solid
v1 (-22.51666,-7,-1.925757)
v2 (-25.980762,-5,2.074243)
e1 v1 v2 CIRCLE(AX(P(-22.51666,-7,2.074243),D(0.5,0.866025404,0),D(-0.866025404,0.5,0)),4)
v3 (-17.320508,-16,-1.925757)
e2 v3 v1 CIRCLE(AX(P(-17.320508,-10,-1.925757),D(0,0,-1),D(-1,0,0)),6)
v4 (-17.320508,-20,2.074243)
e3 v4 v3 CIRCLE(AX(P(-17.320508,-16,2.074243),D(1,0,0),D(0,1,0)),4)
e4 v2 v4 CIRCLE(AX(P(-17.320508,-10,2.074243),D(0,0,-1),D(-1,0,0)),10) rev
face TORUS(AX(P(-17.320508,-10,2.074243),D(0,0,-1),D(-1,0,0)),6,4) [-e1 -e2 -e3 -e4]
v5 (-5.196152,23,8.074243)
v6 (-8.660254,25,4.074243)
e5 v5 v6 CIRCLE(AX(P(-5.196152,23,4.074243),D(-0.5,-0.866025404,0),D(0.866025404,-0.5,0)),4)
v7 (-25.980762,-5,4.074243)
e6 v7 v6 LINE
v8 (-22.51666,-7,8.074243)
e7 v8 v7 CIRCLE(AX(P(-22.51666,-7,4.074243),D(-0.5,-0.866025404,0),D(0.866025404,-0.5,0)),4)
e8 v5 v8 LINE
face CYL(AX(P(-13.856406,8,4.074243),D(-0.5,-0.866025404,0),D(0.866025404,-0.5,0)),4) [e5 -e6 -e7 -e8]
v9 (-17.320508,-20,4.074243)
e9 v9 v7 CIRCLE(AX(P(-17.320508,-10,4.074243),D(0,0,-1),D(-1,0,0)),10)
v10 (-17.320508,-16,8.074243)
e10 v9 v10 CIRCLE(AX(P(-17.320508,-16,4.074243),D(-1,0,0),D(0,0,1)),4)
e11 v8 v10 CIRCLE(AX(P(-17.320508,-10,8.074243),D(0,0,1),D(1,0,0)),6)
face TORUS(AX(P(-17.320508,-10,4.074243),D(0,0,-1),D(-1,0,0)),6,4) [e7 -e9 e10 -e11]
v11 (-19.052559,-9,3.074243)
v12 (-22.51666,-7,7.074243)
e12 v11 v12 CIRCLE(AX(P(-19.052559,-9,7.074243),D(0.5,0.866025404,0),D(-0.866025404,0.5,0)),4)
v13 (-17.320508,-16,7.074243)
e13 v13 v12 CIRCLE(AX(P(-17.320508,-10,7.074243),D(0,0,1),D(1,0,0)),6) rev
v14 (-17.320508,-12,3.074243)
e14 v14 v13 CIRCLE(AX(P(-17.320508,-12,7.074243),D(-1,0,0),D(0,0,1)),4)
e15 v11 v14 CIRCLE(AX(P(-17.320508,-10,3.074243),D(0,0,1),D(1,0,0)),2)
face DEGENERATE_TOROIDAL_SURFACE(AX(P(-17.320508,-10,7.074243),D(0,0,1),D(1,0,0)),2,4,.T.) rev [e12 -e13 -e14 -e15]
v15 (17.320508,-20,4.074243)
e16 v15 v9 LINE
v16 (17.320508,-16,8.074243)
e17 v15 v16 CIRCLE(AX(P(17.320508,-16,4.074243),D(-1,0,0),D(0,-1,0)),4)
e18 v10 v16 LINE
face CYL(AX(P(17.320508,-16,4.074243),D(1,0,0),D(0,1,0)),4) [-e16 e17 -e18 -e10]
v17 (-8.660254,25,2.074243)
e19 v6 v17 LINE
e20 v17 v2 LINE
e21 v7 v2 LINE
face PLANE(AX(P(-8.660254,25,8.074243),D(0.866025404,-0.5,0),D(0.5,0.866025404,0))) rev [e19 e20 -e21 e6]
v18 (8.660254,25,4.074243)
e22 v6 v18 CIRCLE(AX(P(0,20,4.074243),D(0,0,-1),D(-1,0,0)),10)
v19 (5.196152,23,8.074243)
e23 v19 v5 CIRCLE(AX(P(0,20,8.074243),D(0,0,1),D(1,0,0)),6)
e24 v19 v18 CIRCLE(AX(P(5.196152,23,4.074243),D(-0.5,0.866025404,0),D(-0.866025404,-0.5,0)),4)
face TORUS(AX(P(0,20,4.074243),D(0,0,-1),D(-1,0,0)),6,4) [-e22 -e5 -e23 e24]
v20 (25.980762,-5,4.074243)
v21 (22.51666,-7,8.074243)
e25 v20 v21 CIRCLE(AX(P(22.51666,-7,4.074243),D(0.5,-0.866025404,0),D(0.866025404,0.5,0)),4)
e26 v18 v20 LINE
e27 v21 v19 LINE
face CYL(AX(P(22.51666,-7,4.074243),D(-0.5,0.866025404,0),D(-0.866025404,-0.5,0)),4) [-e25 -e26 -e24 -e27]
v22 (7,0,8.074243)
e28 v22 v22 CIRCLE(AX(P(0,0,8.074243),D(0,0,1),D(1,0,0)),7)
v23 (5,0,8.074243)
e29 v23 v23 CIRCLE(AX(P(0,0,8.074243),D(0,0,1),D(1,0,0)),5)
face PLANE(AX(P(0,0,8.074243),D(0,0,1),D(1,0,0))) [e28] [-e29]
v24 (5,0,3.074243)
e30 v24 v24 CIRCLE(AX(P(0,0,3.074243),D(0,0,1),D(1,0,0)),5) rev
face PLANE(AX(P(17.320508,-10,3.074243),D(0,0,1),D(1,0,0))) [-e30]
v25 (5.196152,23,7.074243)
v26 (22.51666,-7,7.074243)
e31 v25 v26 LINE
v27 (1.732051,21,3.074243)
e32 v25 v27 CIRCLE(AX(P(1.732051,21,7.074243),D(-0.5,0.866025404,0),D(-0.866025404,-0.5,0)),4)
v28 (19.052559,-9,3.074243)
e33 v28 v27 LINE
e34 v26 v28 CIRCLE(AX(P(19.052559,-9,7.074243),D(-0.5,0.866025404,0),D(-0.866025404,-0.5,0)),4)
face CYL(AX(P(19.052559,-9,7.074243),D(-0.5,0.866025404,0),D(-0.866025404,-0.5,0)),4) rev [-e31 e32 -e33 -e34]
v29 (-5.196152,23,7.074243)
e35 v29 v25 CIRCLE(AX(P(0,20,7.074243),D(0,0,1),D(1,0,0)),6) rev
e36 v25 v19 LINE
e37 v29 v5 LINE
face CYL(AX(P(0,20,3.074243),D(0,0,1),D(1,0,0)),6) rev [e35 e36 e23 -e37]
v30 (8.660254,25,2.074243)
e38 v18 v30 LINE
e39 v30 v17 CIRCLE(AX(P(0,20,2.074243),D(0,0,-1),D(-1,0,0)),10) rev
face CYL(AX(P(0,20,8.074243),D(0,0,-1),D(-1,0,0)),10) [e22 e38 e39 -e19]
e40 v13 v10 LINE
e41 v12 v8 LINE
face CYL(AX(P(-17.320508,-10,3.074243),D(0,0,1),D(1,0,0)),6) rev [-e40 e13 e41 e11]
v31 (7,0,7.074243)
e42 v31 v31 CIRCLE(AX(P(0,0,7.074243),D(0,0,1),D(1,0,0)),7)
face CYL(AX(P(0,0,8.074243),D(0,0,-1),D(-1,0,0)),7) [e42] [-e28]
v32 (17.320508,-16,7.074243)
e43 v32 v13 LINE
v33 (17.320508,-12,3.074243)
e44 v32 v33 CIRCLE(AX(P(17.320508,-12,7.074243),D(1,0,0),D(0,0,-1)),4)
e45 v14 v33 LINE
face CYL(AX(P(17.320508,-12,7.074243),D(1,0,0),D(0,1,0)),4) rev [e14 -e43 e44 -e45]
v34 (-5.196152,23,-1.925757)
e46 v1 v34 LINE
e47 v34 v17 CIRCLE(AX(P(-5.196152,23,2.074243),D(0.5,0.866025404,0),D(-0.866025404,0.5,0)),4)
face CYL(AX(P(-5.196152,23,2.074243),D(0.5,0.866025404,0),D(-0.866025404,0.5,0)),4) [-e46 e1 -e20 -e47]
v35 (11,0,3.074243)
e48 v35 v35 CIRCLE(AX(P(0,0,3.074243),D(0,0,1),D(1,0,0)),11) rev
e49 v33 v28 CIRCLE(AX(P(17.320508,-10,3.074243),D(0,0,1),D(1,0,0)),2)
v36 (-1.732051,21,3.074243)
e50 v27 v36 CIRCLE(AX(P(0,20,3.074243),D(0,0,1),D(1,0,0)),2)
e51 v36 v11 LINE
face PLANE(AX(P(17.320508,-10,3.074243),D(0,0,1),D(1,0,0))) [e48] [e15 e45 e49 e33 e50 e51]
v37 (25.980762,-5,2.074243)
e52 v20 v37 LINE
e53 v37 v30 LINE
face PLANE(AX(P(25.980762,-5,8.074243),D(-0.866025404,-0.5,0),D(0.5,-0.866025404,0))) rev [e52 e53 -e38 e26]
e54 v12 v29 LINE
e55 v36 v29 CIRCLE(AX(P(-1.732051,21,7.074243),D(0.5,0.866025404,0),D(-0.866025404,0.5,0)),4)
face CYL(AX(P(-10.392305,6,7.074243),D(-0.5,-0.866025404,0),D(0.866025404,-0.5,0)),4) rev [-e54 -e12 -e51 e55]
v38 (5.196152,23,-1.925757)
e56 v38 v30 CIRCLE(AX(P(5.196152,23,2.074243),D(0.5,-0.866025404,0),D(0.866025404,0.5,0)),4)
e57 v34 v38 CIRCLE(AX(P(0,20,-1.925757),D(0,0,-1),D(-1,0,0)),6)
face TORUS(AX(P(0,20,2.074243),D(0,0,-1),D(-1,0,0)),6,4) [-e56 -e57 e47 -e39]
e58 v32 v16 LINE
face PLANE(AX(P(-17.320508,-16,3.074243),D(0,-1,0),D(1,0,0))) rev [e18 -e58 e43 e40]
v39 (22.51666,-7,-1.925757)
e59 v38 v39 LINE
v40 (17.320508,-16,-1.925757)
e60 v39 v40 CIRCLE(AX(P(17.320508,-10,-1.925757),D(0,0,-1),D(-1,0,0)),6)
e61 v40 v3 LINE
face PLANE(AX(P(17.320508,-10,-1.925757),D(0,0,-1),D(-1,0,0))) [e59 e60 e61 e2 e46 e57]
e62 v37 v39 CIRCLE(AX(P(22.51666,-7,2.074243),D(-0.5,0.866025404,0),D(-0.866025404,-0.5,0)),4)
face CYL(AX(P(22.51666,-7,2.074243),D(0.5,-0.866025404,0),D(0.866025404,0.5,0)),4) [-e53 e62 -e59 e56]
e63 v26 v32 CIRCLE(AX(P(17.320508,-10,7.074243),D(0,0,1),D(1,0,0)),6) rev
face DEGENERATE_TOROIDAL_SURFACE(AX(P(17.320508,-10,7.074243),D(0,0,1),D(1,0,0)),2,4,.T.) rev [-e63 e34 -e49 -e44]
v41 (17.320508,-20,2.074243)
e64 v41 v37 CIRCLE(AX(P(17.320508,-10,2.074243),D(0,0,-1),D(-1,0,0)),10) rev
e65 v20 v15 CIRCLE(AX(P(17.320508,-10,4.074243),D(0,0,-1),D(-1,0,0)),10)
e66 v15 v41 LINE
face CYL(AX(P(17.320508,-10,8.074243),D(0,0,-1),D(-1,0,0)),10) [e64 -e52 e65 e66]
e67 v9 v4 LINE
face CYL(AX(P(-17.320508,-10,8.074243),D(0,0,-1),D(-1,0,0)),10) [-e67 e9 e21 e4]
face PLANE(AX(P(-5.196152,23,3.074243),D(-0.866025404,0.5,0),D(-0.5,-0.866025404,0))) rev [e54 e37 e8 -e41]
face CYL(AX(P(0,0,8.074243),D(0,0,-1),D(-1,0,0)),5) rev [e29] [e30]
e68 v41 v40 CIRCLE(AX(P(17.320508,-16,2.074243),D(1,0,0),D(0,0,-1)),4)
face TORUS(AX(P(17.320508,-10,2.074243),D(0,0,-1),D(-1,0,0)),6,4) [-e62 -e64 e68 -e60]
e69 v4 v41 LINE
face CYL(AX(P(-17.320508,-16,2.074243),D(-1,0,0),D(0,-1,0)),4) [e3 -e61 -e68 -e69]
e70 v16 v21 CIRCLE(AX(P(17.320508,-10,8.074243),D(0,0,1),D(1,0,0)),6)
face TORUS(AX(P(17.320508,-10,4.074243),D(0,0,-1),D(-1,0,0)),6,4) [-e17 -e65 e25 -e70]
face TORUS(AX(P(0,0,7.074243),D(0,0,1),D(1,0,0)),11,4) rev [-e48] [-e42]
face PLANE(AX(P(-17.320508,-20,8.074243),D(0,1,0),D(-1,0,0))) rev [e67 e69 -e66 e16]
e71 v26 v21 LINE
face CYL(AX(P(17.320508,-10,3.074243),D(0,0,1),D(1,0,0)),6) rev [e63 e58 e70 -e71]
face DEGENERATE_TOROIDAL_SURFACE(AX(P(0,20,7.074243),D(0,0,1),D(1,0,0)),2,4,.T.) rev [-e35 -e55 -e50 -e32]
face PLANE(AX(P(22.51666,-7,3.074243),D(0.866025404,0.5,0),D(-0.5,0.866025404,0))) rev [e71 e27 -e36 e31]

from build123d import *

# Parameters (mm, degrees)
EXTRUDE_1_DEPTH     = 5
CUT_EXTRUDE_1_DEPTH = 2.5
SKETCH_4_R          = 3.5
SKETCH_4_R_2        = 2.5
EXTRUDE_2_DEPTH     = 2.5
FILLET_1_R          = 2
FILLET_2_R          = 2
FILLET_3_R          = 2
SCALE_1_SCALE       = 2


with BuildPart() as part:
    # 草图2 → 凸台-拉伸1 (new body)
    with BuildSketch(Plane.XY):
        with BuildLine():
            Line((12.990381057, -2.5), (4.330127019, 12.5))
            ThreePointArc((4.330127019, 12.5), (0, 15), (-4.330127019, 12.5))
            Line((-4.330127019, 12.5), (-12.990381057, -2.5))
            ThreePointArc((-12.990381057, -2.5), (-12.990381057, -7.5), (-8.660254038, -10))
            Line((-8.660254038, -10), (8.660254038, -10))
            ThreePointArc((8.660254038, -10), (12.990381057, -7.5), (12.990381057, -2.5))
        make_face()
    extrude(amount=EXTRUDE_1_DEPTH)

    # 草图3 → 切除-拉伸1 (cut)
    with BuildSketch(Plane.XY.offset(5)):
        with BuildLine():
            Line((11.258330249, -3.5), (2.598076211, 11.5))
            ThreePointArc((2.598076211, 11.5), (0, 13), (-2.598076211, 11.5))
            Line((-2.598076211, 11.5), (-11.258330249, -3.5))
            ThreePointArc((-11.258330249, -3.5), (-11.258330249, -6.5), (-8.660254038, -8))
            Line((-8.660254038, -8), (8.660254038, -8))
            ThreePointArc((8.660254038, -8), (11.258330249, -6.5), (11.258330249, -3.5))
        make_face()
    extrude(amount=-CUT_EXTRUDE_1_DEPTH, mode=Mode.SUBTRACT)

    # 草图4 → 凸台-拉伸2 (add)
    with BuildSketch(Plane.XY.offset(2.5)):
        Circle(SKETCH_4_R)
        Circle(SKETCH_4_R_2, mode=Mode.SUBTRACT)
    extrude(amount=EXTRUDE_2_DEPTH)

    # 圆角1
    fillet_1_edges = [part.edges().sort_by_distance(p)[0] for p in [
        (0, 15, 5),
        (-8.660254038, 5, 5),
        (-12.990381057, -7.5, 5),
        (0, -10, 5),
        (12.990381057, -7.5, 5),
        (8.660254038, 5, 5),
    ]]
    fillet(fillet_1_edges, radius=FILLET_1_R - 0.0001)  # a hair under: the kernel refuses the full size

    # 圆角2
    fillet_2_edges = [part.edges().sort_by_distance(p)[0] for p in [
        (11.258330249, -6.5, 2.5),
        (0, -8, 2.5),
        (-11.258330249, -6.5, 2.5),
        (-6.92820323, 4, 2.5),
        (0, 13, 2.5),
        (6.92820323, 4, 2.5),
        (-3.5, 0, 2.5),
    ]]
    fillet(fillet_2_edges, radius=FILLET_2_R)

    # 圆角3
    fillet_3_edges = [part.edges().sort_by_distance(p)[0] for p in [
        (0, -10, 0),
        (-12.990381057, -7.5, 0),
        (-8.660254038, 5, 0),
        (0, 15, 0),
        (8.660254038, 5, 0),
        (12.990381057, -7.5, 0),
    ]]
    fillet(fillet_3_edges, radius=FILLET_3_R)


with BuildPart() as part_1:
    # 缩放比例1: scaled about (0, 0, 1.925767513)
    add(part.part.scale(SCALE_1_SCALE).moved(Location((0, 0, -1.925767513))))


solid = part_1.part
